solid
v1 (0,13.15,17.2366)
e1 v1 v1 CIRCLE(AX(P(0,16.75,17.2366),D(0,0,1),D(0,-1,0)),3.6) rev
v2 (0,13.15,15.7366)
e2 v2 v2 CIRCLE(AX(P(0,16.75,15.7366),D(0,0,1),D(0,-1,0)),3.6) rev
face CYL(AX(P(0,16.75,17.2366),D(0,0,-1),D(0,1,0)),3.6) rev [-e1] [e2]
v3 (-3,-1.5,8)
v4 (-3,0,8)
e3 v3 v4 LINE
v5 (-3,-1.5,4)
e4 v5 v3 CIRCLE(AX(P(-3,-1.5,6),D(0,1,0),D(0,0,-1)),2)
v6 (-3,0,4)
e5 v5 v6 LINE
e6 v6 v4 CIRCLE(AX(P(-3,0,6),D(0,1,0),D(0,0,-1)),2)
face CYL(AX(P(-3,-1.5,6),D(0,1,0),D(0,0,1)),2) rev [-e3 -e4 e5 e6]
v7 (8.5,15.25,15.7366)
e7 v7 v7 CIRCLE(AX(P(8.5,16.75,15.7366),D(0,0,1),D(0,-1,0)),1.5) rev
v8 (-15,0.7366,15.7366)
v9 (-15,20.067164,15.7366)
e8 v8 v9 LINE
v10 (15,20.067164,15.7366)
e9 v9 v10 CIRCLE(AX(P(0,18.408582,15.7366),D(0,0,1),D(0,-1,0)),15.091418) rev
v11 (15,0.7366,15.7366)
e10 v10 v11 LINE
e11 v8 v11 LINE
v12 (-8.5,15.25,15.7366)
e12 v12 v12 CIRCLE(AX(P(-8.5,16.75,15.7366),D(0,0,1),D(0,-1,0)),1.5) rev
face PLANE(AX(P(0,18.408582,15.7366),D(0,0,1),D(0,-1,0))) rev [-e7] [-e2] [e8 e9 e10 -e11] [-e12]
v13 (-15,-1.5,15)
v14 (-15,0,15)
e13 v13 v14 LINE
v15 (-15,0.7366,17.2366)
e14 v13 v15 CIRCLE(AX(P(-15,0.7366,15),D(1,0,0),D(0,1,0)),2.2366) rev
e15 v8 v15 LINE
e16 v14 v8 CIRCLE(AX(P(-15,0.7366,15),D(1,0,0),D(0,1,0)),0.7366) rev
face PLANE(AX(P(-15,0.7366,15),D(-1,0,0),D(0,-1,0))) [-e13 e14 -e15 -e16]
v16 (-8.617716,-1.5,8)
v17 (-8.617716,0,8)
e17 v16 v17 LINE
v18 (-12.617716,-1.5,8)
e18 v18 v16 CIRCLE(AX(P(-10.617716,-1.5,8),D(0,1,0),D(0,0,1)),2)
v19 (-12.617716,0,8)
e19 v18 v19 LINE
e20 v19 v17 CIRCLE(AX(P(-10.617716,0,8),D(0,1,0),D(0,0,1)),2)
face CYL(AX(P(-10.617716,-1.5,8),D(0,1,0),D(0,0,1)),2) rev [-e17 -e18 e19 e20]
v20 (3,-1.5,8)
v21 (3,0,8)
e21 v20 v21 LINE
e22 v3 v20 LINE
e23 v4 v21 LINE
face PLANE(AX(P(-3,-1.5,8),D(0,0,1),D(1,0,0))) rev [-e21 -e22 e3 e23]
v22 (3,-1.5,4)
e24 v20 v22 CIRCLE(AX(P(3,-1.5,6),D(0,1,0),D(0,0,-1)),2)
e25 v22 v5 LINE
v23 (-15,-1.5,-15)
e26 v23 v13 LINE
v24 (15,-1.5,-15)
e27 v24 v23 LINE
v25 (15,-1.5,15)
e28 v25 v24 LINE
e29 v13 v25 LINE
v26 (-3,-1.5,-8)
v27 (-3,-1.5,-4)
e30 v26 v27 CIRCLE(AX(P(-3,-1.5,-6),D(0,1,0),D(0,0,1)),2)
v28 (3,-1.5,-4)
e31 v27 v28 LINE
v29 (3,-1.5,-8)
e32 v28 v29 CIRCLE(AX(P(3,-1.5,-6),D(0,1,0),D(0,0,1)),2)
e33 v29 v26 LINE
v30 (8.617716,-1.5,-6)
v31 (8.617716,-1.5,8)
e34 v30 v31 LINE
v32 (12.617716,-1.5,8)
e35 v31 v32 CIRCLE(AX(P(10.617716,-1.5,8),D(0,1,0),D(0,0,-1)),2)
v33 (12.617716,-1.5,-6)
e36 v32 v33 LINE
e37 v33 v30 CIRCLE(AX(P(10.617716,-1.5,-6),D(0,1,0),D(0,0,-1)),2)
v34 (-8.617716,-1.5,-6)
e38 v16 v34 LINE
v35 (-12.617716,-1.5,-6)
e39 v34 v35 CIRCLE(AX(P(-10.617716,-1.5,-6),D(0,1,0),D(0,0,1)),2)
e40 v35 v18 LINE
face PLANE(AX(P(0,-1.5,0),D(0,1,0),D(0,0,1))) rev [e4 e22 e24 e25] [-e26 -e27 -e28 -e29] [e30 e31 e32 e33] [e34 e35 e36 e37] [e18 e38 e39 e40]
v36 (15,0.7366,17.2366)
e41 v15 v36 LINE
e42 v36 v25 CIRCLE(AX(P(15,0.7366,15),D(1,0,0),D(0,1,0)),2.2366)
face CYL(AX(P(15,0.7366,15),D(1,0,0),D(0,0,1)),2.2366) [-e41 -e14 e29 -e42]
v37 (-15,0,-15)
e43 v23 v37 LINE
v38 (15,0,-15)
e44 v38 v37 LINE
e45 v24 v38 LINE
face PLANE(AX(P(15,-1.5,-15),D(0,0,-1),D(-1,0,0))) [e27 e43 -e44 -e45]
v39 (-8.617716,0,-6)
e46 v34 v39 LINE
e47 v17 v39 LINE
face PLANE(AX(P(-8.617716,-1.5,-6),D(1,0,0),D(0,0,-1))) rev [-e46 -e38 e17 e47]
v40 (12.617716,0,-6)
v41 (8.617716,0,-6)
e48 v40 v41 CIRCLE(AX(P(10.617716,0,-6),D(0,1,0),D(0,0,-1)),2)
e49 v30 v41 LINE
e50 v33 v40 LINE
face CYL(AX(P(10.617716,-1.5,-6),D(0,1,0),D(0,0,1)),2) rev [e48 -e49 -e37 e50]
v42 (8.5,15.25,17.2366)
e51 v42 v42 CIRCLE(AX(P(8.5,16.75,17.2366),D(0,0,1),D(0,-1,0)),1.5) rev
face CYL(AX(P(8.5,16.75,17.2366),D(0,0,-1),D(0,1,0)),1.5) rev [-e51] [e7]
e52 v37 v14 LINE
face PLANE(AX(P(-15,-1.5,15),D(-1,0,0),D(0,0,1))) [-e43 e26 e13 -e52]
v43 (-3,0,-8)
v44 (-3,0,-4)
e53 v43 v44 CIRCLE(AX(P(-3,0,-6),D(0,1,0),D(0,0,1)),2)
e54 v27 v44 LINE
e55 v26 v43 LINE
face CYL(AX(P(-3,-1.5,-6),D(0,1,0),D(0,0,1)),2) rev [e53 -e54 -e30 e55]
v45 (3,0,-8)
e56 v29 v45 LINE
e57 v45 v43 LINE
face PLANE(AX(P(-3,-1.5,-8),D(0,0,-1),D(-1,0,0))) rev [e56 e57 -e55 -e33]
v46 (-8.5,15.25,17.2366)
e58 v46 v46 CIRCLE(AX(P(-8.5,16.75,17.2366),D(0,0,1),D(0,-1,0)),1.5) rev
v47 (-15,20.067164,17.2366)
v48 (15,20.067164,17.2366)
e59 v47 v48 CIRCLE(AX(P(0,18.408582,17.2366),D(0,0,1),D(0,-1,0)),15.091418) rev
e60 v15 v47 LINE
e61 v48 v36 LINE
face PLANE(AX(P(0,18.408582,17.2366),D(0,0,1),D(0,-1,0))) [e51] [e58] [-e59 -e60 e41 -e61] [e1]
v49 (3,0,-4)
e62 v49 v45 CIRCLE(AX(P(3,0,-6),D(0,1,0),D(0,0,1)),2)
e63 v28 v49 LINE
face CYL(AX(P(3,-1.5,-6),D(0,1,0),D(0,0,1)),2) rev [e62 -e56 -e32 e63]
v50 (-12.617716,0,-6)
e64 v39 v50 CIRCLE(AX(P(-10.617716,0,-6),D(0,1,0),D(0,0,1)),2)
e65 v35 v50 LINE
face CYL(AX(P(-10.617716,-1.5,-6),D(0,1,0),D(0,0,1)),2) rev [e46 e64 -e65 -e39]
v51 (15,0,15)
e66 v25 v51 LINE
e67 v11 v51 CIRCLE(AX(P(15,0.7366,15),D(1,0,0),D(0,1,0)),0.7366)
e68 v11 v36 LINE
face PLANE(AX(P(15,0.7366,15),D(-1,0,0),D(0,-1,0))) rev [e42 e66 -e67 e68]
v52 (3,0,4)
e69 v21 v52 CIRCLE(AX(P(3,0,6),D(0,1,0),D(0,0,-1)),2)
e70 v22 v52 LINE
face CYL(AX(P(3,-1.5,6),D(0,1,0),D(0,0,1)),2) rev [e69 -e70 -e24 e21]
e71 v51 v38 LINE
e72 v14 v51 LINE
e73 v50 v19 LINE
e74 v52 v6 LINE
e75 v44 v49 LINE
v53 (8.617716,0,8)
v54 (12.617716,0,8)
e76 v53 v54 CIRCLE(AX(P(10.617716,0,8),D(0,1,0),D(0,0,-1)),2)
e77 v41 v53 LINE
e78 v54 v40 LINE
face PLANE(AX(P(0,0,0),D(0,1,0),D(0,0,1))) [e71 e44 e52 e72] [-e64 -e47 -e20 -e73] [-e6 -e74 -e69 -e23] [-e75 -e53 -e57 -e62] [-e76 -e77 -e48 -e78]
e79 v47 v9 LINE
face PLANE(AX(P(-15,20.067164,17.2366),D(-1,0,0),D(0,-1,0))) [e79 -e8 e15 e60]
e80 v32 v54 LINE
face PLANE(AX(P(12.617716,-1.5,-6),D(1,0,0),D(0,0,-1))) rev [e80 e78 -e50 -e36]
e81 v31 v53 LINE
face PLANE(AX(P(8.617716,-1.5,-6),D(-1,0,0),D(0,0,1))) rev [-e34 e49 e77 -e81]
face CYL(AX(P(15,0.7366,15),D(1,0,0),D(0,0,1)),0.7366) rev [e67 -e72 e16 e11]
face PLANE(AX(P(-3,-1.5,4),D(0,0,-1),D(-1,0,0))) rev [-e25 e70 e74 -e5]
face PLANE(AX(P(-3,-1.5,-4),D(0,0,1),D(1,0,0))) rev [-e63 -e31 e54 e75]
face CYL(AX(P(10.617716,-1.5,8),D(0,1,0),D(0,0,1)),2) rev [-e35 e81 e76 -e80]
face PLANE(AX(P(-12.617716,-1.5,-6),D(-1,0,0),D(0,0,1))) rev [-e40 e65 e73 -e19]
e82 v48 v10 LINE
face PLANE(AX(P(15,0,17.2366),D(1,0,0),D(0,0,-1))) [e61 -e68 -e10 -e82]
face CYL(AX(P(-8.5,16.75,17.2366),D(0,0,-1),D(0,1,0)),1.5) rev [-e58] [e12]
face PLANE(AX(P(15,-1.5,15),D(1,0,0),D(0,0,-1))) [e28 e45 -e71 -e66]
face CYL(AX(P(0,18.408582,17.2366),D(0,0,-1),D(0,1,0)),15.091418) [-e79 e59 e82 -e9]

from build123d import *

# Parameters (mm, degrees)
SKETCH1_W                = 30
SKETCH1_H                = 30
BASE_FLANGE1_DEPTH       = 1.5
EDGE_FLANGE1_DEPTH       = 30
EDGE_FLANGE1_START       = -1.5
EDGE_FLANGE1_PROFILE_R   = 1.5
EDGE_FLANGE1_PROFILE_R_2 = 3.6
EDGE_FLANGE1_FLAT_DEPTH  = 1.5


# Sheet-metal steps are written as plain solids
with BuildPart() as part:
    # Sketch1 → Base-Flange1 (new body)
    with BuildSketch(Plane(origin=(0, 0, 0), x_dir=(1, 0, 0), z_dir=(0, 1, 0))):
        Rectangle(SKETCH1_W, SKETCH1_H)
        with BuildLine():
            Line((-8.617716364, 6), (-8.617716364, -8))
            ThreePointArc((-8.617716364, -8), (-10.617716364, -10), (-12.617716364, -8))
            Line((-12.617716364, -8), (-12.617716364, 6))
            ThreePointArc((-12.617716364, 6), (-10.617716364, 8), (-8.617716364, 6))
        make_face(mode=Mode.SUBTRACT)
        with BuildLine():
            Line((8.617716364, 6), (8.617716364, -8))
            ThreePointArc((8.617716364, -8), (10.617716364, -10), (12.617716364, -8))
            Line((12.617716364, -8), (12.617716364, 6))
            ThreePointArc((12.617716364, 6), (10.617716364, 8), (8.617716364, 6))
        make_face(mode=Mode.SUBTRACT)
        with BuildLine():
            Line((-3, 8), (3, 8))
            ThreePointArc((3, 8), (5, 6), (3, 4))
            Line((3, 4), (-3, 4))
            ThreePointArc((-3, 4), (-5, 6), (-3, 8))
        make_face(mode=Mode.SUBTRACT)
        with BuildLine():
            Line((-3, -8), (3, -8))
            ThreePointArc((3, -8), (5, -6), (3, -4))
            Line((3, -4), (-3, -4))
            ThreePointArc((-3, -4), (-5, -6), (-3, -8))
        make_face(mode=Mode.SUBTRACT)
    extrude(amount=-BASE_FLANGE1_DEPTH)

    # Edge-Flange1 bend section (across the edge) → Edge-Flange1 (add)
    with BuildSketch(Plane(origin=(-15, 0, 15.7366), x_dir=(0, 0, -1), z_dir=(1, 0, 0))):
        with BuildLine():
            Line((-1.5, 0.7366), (0, 0.7366))
            ThreePointArc((0, 0.7366), (0.215745145, 0.215745145), (0.7366, 0))
            Line((0.7366, 0), (0.7366, -1.5))
            ThreePointArc((0.7366, -1.5), (-0.844915027, -0.844915027), (-1.5, 0.7366))
        make_face()
    extrude(amount=EDGE_FLANGE1_DEPTH)

    # Edge-Flange1 profile (on flange) → Edge-Flange1 flat (add)
    with BuildSketch(Plane(origin=(0, 0, 15.7366), x_dir=(-1, 0, 0), z_dir=(0, 0, -1)).offset(EDGE_FLANGE1_START)):
        with BuildLine():
            ThreePointArc((15, 20.067164179), (0, 33.5), (-15, 20.067164179))
            Line((-15, 20.067164179), (-15, 0.7366))
            Line((-15, 0.7366), (15, 0.7366))
            Line((15, 0.7366), (15, 20.067164179))
        make_face()
        with Locations((8.5, 16.75)):
            Circle(EDGE_FLANGE1_PROFILE_R, mode=Mode.SUBTRACT)
        with Locations((0, 16.75)):
            Circle(EDGE_FLANGE1_PROFILE_R_2, mode=Mode.SUBTRACT)
        with Locations((-8.5, 16.75)):
            Circle(EDGE_FLANGE1_PROFILE_R, mode=Mode.SUBTRACT)
    extrude(amount=EDGE_FLANGE1_FLAT_DEPTH)


solid = part.part
